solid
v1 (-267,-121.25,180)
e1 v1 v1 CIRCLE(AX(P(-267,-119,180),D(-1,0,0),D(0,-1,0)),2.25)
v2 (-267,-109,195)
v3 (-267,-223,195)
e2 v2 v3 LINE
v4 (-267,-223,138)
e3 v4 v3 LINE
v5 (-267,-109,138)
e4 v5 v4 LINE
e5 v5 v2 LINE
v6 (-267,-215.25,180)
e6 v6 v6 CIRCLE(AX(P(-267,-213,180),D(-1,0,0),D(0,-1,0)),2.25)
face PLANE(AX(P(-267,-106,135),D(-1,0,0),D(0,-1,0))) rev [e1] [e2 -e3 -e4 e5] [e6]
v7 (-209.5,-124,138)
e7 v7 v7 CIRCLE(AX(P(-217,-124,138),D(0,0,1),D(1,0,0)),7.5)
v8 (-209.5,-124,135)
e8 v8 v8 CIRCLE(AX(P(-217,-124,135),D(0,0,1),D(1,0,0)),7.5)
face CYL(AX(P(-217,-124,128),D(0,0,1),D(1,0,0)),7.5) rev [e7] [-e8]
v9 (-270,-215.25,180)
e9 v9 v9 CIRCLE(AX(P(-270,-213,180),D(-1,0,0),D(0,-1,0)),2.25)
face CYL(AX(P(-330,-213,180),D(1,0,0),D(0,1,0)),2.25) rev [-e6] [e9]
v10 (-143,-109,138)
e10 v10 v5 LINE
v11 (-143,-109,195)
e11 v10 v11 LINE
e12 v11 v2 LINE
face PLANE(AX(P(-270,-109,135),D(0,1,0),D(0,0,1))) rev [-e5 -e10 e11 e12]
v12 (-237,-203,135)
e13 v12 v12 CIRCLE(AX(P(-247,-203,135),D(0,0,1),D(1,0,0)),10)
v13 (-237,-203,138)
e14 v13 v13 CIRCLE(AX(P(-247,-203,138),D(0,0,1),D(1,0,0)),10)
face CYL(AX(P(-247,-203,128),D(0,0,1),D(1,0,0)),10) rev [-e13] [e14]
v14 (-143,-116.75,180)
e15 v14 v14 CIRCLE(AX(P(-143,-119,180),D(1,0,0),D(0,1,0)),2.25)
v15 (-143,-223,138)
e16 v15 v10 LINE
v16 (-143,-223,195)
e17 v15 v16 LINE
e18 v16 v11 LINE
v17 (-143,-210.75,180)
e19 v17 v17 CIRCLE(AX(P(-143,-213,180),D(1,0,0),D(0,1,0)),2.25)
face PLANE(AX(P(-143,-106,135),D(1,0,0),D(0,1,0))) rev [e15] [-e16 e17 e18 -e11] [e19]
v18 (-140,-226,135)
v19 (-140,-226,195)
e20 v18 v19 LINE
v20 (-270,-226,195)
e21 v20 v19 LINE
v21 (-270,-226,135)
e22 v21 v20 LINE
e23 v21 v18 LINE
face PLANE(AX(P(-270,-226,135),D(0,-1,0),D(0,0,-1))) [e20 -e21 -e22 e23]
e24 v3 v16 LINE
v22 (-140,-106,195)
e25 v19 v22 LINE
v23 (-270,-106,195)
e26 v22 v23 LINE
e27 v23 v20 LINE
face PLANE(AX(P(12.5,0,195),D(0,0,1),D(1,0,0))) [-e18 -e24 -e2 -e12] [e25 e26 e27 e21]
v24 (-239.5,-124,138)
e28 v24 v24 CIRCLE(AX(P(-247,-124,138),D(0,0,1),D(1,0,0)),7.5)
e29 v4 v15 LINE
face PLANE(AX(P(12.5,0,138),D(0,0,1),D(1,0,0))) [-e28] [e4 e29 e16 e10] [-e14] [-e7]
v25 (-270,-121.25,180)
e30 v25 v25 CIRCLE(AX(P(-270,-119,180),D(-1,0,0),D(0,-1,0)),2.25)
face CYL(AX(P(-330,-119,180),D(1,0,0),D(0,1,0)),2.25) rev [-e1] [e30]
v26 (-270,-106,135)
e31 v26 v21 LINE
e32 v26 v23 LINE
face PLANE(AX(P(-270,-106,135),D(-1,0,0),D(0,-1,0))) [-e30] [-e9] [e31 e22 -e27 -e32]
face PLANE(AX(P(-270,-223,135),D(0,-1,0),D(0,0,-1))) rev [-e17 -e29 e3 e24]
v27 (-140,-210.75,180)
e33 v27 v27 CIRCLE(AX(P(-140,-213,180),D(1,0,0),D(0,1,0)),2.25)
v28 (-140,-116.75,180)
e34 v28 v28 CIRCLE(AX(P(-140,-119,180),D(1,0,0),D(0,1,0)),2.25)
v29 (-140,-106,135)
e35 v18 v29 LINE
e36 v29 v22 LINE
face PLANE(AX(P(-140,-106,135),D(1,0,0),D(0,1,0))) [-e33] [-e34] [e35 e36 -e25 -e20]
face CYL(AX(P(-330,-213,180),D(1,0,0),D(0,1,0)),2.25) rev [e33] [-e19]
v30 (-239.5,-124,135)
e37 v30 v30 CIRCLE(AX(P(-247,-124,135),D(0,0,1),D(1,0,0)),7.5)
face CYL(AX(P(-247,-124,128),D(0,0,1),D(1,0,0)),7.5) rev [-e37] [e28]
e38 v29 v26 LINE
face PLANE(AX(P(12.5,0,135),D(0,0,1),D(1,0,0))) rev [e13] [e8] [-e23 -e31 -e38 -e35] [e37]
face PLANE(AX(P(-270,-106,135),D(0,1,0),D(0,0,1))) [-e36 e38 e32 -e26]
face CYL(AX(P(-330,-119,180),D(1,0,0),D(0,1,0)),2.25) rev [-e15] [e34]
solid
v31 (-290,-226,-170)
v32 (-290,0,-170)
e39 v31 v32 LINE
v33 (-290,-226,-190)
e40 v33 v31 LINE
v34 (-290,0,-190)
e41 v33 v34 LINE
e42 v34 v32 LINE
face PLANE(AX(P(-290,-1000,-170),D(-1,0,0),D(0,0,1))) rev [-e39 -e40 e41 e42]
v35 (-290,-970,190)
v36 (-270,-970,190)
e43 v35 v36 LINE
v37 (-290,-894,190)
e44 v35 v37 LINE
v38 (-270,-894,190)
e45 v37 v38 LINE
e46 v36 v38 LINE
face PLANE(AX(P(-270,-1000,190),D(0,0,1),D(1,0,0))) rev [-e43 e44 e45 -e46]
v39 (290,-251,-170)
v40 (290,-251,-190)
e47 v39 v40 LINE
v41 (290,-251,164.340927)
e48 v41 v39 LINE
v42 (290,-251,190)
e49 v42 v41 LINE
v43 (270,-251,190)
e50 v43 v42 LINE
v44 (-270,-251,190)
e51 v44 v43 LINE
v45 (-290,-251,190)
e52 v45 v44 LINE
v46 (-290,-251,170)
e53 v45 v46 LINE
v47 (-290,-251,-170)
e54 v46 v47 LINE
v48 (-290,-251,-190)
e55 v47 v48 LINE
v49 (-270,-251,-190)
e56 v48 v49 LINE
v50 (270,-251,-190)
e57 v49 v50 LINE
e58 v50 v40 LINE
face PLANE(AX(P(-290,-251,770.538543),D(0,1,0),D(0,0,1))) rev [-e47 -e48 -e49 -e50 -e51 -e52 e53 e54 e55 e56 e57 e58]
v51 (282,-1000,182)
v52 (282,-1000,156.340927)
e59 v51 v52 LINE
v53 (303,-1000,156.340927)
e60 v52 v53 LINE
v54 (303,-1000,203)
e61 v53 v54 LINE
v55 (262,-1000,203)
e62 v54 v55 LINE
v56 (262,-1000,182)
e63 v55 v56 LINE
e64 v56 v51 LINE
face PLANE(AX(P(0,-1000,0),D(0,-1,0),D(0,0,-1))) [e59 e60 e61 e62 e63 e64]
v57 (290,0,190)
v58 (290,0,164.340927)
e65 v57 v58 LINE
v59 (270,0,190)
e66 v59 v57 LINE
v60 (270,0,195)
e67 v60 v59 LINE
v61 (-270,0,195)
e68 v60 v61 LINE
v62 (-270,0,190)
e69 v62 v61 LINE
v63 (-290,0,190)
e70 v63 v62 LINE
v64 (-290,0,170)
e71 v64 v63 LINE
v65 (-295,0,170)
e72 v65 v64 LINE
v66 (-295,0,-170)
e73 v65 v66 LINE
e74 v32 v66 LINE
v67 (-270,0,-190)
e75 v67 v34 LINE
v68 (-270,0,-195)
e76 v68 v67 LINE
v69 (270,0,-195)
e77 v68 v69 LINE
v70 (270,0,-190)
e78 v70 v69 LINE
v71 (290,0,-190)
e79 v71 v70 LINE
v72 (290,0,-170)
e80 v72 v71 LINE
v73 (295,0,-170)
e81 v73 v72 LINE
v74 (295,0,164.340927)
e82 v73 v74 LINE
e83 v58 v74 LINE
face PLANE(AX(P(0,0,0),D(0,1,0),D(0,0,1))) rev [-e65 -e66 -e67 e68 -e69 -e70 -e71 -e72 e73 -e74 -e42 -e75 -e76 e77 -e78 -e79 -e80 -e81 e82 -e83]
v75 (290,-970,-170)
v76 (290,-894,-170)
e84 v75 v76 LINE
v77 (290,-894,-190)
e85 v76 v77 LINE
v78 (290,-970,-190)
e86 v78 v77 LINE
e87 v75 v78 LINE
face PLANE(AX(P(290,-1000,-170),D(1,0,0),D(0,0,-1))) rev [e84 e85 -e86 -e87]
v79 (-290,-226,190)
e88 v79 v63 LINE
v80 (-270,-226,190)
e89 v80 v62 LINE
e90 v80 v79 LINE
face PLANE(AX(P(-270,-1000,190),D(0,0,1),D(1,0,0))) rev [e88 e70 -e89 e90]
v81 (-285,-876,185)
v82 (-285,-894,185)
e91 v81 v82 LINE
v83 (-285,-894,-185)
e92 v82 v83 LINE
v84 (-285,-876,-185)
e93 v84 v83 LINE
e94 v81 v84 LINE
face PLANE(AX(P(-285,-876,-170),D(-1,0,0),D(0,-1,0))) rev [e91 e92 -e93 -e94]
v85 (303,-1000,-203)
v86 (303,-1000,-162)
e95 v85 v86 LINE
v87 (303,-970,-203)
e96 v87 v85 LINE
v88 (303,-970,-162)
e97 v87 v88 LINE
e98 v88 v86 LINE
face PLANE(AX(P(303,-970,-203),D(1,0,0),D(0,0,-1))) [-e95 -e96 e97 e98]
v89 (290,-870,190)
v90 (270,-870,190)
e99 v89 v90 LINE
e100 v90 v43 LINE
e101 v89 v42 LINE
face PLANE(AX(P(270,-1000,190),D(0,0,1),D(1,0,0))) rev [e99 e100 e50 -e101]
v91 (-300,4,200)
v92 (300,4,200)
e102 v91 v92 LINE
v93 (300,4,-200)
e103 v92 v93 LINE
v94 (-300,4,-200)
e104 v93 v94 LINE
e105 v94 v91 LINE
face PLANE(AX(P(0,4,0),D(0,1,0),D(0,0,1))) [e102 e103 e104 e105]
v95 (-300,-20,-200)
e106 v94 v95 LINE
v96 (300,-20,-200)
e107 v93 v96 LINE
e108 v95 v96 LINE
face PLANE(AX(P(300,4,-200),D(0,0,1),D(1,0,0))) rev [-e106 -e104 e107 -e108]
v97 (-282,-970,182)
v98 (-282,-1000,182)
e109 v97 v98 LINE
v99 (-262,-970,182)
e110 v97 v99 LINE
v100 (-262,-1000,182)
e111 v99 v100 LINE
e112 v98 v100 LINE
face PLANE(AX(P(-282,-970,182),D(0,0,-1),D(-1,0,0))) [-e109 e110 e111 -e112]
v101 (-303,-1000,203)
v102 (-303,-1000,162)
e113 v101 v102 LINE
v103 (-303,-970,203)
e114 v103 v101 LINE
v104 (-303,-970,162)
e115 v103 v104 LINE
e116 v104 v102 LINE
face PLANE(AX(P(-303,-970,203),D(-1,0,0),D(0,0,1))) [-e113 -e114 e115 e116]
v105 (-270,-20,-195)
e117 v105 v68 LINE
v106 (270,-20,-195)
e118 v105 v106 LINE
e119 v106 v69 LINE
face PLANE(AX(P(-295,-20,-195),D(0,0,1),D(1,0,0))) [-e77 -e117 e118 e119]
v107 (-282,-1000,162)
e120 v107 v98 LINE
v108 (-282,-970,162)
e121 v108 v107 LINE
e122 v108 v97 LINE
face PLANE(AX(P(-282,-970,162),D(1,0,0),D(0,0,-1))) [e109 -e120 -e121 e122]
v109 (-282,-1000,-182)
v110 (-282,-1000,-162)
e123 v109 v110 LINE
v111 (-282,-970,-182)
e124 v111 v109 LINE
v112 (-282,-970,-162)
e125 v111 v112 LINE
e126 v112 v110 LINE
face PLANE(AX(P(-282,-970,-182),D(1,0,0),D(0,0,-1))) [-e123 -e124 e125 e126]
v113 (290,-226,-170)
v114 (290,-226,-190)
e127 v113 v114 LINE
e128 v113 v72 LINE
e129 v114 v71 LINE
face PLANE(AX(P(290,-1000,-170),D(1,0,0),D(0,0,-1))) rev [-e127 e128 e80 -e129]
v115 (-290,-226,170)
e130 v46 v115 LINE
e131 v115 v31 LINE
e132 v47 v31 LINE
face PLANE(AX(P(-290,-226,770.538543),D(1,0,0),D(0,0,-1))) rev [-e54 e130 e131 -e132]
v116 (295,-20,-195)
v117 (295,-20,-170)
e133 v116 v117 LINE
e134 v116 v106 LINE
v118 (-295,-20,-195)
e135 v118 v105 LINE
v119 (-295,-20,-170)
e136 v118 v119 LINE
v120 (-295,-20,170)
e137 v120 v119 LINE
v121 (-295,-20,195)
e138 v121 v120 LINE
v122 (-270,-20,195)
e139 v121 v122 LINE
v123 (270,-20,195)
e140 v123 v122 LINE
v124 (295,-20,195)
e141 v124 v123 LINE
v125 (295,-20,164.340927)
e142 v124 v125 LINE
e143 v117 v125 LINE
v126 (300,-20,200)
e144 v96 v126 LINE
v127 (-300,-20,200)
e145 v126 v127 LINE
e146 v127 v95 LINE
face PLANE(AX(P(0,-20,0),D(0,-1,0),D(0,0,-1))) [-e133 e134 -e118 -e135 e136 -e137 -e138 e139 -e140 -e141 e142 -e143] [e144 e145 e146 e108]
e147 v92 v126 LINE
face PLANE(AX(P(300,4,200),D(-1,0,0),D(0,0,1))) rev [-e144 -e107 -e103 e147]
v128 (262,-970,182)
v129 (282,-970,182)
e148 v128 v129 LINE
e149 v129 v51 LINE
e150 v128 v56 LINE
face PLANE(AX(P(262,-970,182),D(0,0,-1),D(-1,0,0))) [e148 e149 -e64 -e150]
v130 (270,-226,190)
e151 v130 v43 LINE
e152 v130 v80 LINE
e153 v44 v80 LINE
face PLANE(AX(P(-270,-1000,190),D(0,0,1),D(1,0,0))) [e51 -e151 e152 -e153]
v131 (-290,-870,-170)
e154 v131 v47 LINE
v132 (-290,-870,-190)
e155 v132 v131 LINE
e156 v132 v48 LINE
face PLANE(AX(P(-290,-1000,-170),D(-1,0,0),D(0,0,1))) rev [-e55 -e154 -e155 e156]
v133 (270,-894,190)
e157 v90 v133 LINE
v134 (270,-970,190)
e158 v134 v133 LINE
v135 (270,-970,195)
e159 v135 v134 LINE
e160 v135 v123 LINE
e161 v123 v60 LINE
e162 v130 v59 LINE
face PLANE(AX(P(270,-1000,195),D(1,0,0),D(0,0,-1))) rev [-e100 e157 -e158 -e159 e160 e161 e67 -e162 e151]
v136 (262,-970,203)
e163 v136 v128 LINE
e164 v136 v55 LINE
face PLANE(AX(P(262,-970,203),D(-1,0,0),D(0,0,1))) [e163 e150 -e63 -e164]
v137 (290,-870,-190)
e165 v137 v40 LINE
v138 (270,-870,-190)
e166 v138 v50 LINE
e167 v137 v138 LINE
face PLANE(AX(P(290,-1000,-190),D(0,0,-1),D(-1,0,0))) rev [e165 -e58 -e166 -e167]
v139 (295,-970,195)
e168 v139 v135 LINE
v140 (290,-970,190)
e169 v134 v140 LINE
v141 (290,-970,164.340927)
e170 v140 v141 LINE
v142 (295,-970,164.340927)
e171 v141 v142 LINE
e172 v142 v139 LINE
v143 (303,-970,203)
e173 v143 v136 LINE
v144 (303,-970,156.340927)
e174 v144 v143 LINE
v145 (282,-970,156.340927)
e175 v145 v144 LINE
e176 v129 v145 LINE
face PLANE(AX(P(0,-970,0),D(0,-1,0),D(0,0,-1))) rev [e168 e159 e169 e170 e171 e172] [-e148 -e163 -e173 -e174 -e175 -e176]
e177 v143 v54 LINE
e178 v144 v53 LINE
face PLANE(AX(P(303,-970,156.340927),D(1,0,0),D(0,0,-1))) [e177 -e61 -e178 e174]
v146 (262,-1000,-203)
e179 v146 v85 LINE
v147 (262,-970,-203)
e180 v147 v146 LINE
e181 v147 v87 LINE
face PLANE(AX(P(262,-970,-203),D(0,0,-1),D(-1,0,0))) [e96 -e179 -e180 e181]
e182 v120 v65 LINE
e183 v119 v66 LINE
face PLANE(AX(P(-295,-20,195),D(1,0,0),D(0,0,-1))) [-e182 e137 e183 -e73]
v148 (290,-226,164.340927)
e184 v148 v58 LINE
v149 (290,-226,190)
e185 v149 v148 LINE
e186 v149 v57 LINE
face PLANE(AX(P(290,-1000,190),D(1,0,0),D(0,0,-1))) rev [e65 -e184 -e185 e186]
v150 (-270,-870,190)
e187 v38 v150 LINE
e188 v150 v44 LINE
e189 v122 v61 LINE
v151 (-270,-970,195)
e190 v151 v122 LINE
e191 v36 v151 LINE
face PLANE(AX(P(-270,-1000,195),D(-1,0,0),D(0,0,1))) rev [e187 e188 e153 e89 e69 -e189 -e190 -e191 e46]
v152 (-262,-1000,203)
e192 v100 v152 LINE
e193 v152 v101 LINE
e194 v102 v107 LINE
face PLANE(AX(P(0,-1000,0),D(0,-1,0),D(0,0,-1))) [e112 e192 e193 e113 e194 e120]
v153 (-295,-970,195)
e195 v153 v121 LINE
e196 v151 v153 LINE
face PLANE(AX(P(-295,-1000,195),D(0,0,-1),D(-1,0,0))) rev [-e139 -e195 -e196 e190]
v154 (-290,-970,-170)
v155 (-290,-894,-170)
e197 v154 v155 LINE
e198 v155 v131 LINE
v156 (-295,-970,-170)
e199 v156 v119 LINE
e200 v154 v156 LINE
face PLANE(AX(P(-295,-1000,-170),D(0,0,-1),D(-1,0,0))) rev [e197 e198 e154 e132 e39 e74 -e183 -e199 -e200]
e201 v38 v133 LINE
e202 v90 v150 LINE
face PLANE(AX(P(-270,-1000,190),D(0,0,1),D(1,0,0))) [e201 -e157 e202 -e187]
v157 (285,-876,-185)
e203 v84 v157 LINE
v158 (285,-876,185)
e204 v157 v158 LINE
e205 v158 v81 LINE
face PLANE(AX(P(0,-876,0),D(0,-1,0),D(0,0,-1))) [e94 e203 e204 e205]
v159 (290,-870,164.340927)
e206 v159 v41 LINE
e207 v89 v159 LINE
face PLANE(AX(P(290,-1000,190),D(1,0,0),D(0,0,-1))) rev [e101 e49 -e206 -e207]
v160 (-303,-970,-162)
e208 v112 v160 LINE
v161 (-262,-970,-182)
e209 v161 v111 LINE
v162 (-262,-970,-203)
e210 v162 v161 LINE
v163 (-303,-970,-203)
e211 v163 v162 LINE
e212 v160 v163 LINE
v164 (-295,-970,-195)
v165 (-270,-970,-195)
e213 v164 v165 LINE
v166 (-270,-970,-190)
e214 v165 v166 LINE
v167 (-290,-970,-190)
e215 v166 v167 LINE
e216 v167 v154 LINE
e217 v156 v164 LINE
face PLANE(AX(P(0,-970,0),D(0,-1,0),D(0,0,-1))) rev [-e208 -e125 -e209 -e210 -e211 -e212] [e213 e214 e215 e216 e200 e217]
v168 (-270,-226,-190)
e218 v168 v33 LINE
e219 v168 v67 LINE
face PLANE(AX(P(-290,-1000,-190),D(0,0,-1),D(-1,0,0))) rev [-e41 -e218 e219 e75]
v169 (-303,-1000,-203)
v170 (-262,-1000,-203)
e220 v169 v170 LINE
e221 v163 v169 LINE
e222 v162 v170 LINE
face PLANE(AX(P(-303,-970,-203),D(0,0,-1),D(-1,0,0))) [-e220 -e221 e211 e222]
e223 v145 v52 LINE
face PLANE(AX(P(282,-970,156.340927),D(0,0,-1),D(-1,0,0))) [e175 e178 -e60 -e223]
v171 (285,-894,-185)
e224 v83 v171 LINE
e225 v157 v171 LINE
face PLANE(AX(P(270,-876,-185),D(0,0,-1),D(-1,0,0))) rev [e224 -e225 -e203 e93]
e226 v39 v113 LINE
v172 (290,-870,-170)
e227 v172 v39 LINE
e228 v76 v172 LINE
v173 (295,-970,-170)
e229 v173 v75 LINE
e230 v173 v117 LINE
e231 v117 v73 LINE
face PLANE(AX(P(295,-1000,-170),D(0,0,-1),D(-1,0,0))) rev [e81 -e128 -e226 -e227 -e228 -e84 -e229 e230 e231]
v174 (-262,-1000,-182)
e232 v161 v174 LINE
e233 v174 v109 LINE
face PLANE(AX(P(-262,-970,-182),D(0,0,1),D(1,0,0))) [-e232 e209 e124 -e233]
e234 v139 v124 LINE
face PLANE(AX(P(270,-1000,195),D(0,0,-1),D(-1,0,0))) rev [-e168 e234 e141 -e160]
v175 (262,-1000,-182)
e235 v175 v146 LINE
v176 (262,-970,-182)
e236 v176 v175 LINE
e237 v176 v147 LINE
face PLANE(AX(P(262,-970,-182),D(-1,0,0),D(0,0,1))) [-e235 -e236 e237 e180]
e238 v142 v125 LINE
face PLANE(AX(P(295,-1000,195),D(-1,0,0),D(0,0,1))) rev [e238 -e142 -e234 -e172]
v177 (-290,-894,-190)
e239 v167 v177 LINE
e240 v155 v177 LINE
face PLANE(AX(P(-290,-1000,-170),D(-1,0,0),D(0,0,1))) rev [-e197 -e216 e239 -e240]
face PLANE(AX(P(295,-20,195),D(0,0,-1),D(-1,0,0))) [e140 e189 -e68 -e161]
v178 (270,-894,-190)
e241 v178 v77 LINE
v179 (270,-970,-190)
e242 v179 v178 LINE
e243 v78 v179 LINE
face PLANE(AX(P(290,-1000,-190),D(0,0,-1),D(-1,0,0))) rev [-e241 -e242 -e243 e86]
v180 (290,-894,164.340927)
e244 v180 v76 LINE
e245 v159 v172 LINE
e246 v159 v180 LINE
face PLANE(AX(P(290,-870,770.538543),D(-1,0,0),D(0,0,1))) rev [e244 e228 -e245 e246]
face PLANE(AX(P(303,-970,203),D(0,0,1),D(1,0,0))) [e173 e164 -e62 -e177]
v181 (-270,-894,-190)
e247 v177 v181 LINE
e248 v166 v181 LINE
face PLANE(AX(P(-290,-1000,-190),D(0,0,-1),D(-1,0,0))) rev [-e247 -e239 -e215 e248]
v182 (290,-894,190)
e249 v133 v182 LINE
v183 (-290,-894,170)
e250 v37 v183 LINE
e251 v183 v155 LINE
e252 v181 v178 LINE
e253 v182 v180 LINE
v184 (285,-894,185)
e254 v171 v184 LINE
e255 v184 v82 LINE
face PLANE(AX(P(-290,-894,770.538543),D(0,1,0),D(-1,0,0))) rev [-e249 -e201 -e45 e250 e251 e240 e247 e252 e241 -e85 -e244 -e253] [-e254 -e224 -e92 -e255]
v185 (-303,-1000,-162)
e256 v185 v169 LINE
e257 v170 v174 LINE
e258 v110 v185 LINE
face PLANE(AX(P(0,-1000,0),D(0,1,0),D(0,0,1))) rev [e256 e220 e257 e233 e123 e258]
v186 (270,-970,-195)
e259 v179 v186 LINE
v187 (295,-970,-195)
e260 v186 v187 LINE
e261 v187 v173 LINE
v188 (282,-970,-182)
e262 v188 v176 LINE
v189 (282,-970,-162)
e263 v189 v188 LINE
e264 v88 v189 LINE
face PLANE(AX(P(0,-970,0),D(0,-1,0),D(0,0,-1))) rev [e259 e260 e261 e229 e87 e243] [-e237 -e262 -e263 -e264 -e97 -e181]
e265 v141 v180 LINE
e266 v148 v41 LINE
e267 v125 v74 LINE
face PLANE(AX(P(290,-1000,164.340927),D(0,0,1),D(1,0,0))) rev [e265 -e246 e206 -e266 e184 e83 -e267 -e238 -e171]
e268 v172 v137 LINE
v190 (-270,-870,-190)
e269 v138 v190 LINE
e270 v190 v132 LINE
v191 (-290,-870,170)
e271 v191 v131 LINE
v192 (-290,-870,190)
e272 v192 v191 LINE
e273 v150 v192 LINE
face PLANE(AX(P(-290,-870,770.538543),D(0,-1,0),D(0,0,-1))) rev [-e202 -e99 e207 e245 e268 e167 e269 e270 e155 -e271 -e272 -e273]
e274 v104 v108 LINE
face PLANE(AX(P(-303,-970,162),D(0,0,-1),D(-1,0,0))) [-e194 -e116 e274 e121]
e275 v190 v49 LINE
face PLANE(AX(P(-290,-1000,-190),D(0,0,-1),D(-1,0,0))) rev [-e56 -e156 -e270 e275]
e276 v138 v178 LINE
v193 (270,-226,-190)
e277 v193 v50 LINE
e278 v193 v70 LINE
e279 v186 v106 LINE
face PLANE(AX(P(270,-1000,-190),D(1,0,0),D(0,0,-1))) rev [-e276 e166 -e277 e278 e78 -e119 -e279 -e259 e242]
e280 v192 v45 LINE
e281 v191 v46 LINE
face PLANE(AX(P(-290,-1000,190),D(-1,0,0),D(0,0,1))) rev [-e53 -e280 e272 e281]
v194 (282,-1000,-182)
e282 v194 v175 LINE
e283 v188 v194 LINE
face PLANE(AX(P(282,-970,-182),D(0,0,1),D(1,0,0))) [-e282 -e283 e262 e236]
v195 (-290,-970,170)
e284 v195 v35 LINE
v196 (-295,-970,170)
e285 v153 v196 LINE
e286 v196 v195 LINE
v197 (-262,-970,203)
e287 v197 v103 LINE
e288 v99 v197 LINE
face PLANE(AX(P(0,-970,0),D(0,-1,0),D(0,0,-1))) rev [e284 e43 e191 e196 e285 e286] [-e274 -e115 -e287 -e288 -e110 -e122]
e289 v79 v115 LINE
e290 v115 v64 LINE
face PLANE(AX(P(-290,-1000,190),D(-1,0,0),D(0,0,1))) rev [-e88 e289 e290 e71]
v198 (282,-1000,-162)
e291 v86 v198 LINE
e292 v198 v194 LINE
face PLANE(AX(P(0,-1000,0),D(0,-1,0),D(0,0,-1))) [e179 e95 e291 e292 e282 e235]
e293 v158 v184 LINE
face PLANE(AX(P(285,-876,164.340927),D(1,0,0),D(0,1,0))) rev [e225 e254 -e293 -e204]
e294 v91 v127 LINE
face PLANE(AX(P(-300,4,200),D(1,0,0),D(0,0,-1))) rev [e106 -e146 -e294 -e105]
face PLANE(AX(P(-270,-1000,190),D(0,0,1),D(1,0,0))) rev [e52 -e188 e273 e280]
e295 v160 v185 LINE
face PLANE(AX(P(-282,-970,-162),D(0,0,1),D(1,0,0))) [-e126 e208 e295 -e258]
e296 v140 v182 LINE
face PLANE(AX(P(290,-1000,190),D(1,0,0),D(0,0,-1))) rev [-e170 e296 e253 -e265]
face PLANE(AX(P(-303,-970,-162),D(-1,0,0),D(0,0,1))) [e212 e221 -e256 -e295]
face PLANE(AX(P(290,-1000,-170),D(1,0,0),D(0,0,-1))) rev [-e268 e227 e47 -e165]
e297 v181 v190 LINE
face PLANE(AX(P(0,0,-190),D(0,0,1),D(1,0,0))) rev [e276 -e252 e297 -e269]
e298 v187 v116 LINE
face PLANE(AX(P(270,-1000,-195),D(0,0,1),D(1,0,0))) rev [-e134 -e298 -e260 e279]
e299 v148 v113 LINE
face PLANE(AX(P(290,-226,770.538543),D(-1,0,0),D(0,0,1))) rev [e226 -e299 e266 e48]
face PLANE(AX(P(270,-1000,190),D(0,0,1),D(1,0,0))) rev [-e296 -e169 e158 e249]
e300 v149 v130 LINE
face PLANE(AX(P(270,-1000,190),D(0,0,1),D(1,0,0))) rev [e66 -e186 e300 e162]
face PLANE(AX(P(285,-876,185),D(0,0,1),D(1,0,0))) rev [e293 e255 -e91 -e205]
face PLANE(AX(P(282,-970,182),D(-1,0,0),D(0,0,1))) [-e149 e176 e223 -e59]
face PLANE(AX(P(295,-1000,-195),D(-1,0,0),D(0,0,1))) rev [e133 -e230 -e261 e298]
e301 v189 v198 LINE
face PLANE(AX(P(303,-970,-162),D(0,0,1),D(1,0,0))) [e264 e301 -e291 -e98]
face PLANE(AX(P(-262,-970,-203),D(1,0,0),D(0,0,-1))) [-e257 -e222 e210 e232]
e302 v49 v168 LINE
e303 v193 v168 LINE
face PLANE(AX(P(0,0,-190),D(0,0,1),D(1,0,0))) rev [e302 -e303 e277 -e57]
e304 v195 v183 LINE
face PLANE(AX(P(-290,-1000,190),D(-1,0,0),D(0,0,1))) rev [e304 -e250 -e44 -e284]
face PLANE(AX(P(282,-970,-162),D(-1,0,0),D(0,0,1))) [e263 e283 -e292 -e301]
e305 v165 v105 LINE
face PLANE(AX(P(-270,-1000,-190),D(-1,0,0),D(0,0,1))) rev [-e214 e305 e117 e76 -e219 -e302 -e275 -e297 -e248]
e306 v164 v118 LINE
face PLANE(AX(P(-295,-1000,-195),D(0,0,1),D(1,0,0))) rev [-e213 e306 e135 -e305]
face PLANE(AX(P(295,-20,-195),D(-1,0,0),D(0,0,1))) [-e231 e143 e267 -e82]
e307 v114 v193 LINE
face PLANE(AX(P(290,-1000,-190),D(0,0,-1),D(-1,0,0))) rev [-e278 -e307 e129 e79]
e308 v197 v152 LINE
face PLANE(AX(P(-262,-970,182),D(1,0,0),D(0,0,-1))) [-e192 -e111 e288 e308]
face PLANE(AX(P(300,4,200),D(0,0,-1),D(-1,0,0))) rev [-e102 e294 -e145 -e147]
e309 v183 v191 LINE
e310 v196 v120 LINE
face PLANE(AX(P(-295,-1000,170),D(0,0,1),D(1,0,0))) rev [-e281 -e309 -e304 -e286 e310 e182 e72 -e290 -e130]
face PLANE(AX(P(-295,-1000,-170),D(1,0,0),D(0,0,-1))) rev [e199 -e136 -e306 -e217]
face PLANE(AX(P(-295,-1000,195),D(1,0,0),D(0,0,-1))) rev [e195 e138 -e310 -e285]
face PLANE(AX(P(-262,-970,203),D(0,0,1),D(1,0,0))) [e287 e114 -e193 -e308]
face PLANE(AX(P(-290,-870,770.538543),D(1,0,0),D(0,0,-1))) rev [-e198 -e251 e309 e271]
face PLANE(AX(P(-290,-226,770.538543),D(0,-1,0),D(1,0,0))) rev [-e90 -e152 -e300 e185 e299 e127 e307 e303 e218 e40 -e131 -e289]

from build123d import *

# Parameters (mm, degrees)
CROQUIS1_W                       = 600
CROQUIS1_H                       = 400
SALIENTE_EXTRUIR1_DEPTH          = 4
CROQUIS2_W                       = 600
CROQUIS2_H                       = 400
CROQUIS2_W_2                     = 590
CROQUIS2_H_2                     = 390
SALIENTE_EXTRUIR2_DEPTH          = 20
SALIENTE_EXTRUIR3_DEPTH          = 1000
SALIENTE_EXTRUIR4_DEPTH          = 30
CROQUIS5_W                       = 580
CROQUIS5_H                       = 25
CROQUIS5_H_2                     = 24
SALIENTE_EXTRUIR5_DEPTH          = 380
CORTAR_EXTRUIR2_DEPTH            = 18
CROQUIS8_W                       = 130
CROQUIS8_H                       = 120
SALIENTE_EXTRUIR6_DEPTH          = 60
VACIADO1_T                       = -3
S_LIDO_MOVER_COPIAR1_START       = -282.5
S_LIDO_MOVER_COPIAR1_OUTLINE_W   = 120
S_LIDO_MOVER_COPIAR1_OUTLINE_H   = 60
S_LIDO_MOVER_COPIAR1_DEPTH       = 12.5
S_LIDO_MOVER_COPIAR1_START_2     = -155.5
S_LIDO_MOVER_COPIAR1_2_OUTLINE_W = 114
S_LIDO_MOVER_COPIAR1_2_OUTLINE_H = 57
S_LIDO_MOVER_COPIAR1_2_DEPTH     = 3
S_LIDO_MOVER_COPIAR1_START_3     = -143
S_LIDO_MOVER_COPIAR1_3_OUTLINE_W = 120
S_LIDO_MOVER_COPIAR1_3_OUTLINE_H = 60
S_LIDO_MOVER_COPIAR1_3_DEPTH     = 3
S_LIDO_MOVER_COPIAR1_START_4     = -270
S_LIDO_MOVER_COPIAR1_4_OUTLINE_W = 114
S_LIDO_MOVER_COPIAR1_4_OUTLINE_H = 57
S_LIDO_MOVER_COPIAR1_4_DEPTH     = 3
S_LIDO_MOVER_COPIAR1_START_5     = -152.5
S_LIDO_MOVER_COPIAR1_5_DEPTH     = 9.5
CROQUIS11_R                      = 10
CROQUIS11_R_2                    = 7.5
CORTAR_EXTRUIR3_DEPTH            = 10
CROQUIS12_R                      = 2.25
CORTAR_EXTRUIR4_DEPTH            = 190


# Read off the part's stored shape, not the designer's step: Sólido-Mover/Copiar1
with BuildPart() as part:
    # Croquis1 → Saliente-Extruir1 (new body)
    with BuildSketch(Plane(origin=(0, 0, 0), x_dir=(1, 0, 0), z_dir=(0, 1, 0))):
        Rectangle(CROQUIS1_W, CROQUIS1_H)
    extrude(amount=SALIENTE_EXTRUIR1_DEPTH)

    # Croquis2 → Saliente-Extruir2 (add)
    with BuildSketch(Plane.XZ):
        Rectangle(CROQUIS2_W, CROQUIS2_H)
        Rectangle(CROQUIS2_W_2, CROQUIS2_H_2, mode=Mode.SUBTRACT)
    extrude(amount=SALIENTE_EXTRUIR2_DEPTH)

    # Croquis3 → Saliente-Extruir3 (add)
    with BuildSketch(Plane.XZ):
        Polygon((-270, 190), (-290, 190), (-290, 170), (-295, 170), (-295, 195), (-270, 195), align=None)
        Polygon((270, 195), (295, 195), (295, 164.340926839), (290, 164.340926839), (290, 190), (270, 190), align=None)
        Polygon((270, -195), (295, -195), (295, -170), (290, -170), (290, -190), (270, -190), align=None)
        Polygon((-295, -170), (-295, -195), (-270, -195), (-270, -190), (-290, -190), (-290, -170), align=None)
    extrude(amount=SALIENTE_EXTRUIR3_DEPTH)

    # Croquis4 → Saliente-Extruir4 (add)
    # profile 1 of 4: a face of its own
    with BuildSketch(Plane.XZ.offset(1000)):
        Polygon((-303, 203), (-303, 162), (-282, 162), (-282, 182), (-262, 182), (-262, 203), align=None)
        Polygon((-295, 195), (-295, 170), (-290, 170), (-290, 190), (-270, 190), (-270, 195), align=None, mode=Mode.SUBTRACT)
    # profile 2 of 4: a face of its own
    with BuildSketch(Plane.XZ.offset(1000)):
        Polygon((-282, -162), (-303, -162), (-303, -203), (-262, -203), (-262, -182), (-282, -182), align=None)
        Polygon((-290, -170), (-295, -170), (-295, -195), (-270, -195), (-270, -190), (-290, -190), align=None, mode=Mode.SUBTRACT)
    # profile 3 of 4: a face of its own
    with BuildSketch(Plane.XZ.offset(1000)):
        Polygon((262, 203), (262, 182), (282, 182), (282, 156.340926839), (303, 156.340926839), (303, 203), align=None)
        Polygon((270, 195), (270, 190), (290, 190), (290, 164.340926839), (295, 164.340926839), (295, 195), align=None, mode=Mode.SUBTRACT)
    # profile 4 of 4: a face of its own
    with BuildSketch(Plane.XZ.offset(1000)):
        Polygon((262, -182), (262, -203), (303, -203), (303, -162), (282, -162), (282, -182), align=None)
        Polygon((270, -190), (270, -195), (295, -195), (295, -170), (290, -170), (290, -190), align=None, mode=Mode.SUBTRACT)
    extrude(amount=-SALIENTE_EXTRUIR4_DEPTH)

    # Croquis5 → Saliente-Extruir5 (add)
    with BuildSketch(Plane.XY.offset(-190)):
        with Locations((0, -238.5)):
            Rectangle(CROQUIS5_W, CROQUIS5_H)
        with Locations((0, -882)):
            Rectangle(CROQUIS5_W, CROQUIS5_H_2)
    extrude(amount=SALIENTE_EXTRUIR5_DEPTH)

    # Croquis7 → Cortar-Extruir2 (cut)
    with BuildSketch(Plane.XZ.offset(894)):
        Polygon((-270, 185), (-285, 185), (-285, 170), (-285, -170), (-285, -185), (-270, -185), (270, -185), (285, -185), (285, -170), (285, 164.340926839), (285, 185), (270, 185), align=None)
    extrude(amount=-CORTAR_EXTRUIR2_DEPTH, mode=Mode.SUBTRACT)


with BuildPart() as body_2:
    # Croquis8 → Saliente-Extruir6 (new body)
    with BuildSketch(Plane.XY.offset(195)):
        with Locations((-217.5, -166)):
            Rectangle(CROQUIS8_W, CROQUIS8_H)
    extrude(amount=-SALIENTE_EXTRUIR6_DEPTH)

    # Vaciado1
    vaciado1_openings = [body_2.faces().sort_by_distance(p)[0] for p in [
        (-217.5, -166, 195),
    ]]
    offset(amount=VACIADO1_T, openings=vaciado1_openings, kind=Kind.INTERSECTION)

    # Sólido-Mover/Copiar1 outline → Sólido-Mover/Copiar1 (cut)
    with BuildSketch(Plane.YZ.offset(S_LIDO_MOVER_COPIAR1_START)):
        with Locations((-166, 165)):
            Rectangle(S_LIDO_MOVER_COPIAR1_OUTLINE_W, S_LIDO_MOVER_COPIAR1_OUTLINE_H)
    extrude(amount=S_LIDO_MOVER_COPIAR1_DEPTH, mode=Mode.SUBTRACT)

    # S_lido-Mover_Copiar1 2 outline → S_lido-Mover_Copiar1 2 (cut)
    with BuildSketch(Plane.YZ.offset(S_LIDO_MOVER_COPIAR1_START_2)):
        with Locations((-166, 166.5)):
            Rectangle(S_LIDO_MOVER_COPIAR1_2_OUTLINE_W, S_LIDO_MOVER_COPIAR1_2_OUTLINE_H)
    extrude(amount=S_LIDO_MOVER_COPIAR1_2_DEPTH, mode=Mode.SUBTRACT)

    # S_lido-Mover_Copiar1 3 outline → S_lido-Mover_Copiar1 3 (add)
    with BuildSketch(Plane.YZ.offset(S_LIDO_MOVER_COPIAR1_START_3)):
        with Locations((-166, 165)):
            Rectangle(S_LIDO_MOVER_COPIAR1_3_OUTLINE_W, S_LIDO_MOVER_COPIAR1_3_OUTLINE_H)
    extrude(amount=S_LIDO_MOVER_COPIAR1_3_DEPTH)

    # S_lido-Mover_Copiar1 4 outline → S_lido-Mover_Copiar1 4 (add)
    with BuildSketch(Plane.YZ.offset(S_LIDO_MOVER_COPIAR1_START_4)):
        with Locations((-166, 166.5)):
            Rectangle(S_LIDO_MOVER_COPIAR1_4_OUTLINE_W, S_LIDO_MOVER_COPIAR1_4_OUTLINE_H)
    extrude(amount=S_LIDO_MOVER_COPIAR1_4_DEPTH)

    # S_lido-Mover_Copiar1 5 outline → S_lido-Mover_Copiar1 5 (add)
    with BuildSketch(Plane.YZ.offset(S_LIDO_MOVER_COPIAR1_START_5)):
        Polygon((-106, 135), (-106, 195), (-109, 195), (-109, 138), (-223, 138), (-223, 195), (-226, 195), (-226, 135), align=None)
    extrude(amount=S_LIDO_MOVER_COPIAR1_5_DEPTH)

    # Croquis11 → Cortar-Extruir3 (cut)
    with BuildSketch(Plane.XY.offset(138)):
        with Locations((-247, -203)):
            Circle(CROQUIS11_R)
        with Locations((-247, -124)):
            Circle(CROQUIS11_R_2)
        with Locations((-217, -124)):
            Circle(CROQUIS11_R_2)
    extrude(amount=-CORTAR_EXTRUIR3_DEPTH, mode=Mode.SUBTRACT)

    # Croquis12 → Cortar-Extruir4 (cut)
    with BuildSketch(Plane(origin=(-140, 0, 0), x_dir=(0, 0, -1), z_dir=(1, 0, 0))):
        with Locations(Location((-180, -119, 0), (0, 0, 90))):
            Circle(CROQUIS12_R)
        with Locations(Location((-180, -213, 0), (0, 0, 90))):
            Circle(CROQUIS12_R)
    extrude(amount=-CORTAR_EXTRUIR4_DEPTH, mode=Mode.SUBTRACT)


solid = Compound([part.part, body_2.part])
